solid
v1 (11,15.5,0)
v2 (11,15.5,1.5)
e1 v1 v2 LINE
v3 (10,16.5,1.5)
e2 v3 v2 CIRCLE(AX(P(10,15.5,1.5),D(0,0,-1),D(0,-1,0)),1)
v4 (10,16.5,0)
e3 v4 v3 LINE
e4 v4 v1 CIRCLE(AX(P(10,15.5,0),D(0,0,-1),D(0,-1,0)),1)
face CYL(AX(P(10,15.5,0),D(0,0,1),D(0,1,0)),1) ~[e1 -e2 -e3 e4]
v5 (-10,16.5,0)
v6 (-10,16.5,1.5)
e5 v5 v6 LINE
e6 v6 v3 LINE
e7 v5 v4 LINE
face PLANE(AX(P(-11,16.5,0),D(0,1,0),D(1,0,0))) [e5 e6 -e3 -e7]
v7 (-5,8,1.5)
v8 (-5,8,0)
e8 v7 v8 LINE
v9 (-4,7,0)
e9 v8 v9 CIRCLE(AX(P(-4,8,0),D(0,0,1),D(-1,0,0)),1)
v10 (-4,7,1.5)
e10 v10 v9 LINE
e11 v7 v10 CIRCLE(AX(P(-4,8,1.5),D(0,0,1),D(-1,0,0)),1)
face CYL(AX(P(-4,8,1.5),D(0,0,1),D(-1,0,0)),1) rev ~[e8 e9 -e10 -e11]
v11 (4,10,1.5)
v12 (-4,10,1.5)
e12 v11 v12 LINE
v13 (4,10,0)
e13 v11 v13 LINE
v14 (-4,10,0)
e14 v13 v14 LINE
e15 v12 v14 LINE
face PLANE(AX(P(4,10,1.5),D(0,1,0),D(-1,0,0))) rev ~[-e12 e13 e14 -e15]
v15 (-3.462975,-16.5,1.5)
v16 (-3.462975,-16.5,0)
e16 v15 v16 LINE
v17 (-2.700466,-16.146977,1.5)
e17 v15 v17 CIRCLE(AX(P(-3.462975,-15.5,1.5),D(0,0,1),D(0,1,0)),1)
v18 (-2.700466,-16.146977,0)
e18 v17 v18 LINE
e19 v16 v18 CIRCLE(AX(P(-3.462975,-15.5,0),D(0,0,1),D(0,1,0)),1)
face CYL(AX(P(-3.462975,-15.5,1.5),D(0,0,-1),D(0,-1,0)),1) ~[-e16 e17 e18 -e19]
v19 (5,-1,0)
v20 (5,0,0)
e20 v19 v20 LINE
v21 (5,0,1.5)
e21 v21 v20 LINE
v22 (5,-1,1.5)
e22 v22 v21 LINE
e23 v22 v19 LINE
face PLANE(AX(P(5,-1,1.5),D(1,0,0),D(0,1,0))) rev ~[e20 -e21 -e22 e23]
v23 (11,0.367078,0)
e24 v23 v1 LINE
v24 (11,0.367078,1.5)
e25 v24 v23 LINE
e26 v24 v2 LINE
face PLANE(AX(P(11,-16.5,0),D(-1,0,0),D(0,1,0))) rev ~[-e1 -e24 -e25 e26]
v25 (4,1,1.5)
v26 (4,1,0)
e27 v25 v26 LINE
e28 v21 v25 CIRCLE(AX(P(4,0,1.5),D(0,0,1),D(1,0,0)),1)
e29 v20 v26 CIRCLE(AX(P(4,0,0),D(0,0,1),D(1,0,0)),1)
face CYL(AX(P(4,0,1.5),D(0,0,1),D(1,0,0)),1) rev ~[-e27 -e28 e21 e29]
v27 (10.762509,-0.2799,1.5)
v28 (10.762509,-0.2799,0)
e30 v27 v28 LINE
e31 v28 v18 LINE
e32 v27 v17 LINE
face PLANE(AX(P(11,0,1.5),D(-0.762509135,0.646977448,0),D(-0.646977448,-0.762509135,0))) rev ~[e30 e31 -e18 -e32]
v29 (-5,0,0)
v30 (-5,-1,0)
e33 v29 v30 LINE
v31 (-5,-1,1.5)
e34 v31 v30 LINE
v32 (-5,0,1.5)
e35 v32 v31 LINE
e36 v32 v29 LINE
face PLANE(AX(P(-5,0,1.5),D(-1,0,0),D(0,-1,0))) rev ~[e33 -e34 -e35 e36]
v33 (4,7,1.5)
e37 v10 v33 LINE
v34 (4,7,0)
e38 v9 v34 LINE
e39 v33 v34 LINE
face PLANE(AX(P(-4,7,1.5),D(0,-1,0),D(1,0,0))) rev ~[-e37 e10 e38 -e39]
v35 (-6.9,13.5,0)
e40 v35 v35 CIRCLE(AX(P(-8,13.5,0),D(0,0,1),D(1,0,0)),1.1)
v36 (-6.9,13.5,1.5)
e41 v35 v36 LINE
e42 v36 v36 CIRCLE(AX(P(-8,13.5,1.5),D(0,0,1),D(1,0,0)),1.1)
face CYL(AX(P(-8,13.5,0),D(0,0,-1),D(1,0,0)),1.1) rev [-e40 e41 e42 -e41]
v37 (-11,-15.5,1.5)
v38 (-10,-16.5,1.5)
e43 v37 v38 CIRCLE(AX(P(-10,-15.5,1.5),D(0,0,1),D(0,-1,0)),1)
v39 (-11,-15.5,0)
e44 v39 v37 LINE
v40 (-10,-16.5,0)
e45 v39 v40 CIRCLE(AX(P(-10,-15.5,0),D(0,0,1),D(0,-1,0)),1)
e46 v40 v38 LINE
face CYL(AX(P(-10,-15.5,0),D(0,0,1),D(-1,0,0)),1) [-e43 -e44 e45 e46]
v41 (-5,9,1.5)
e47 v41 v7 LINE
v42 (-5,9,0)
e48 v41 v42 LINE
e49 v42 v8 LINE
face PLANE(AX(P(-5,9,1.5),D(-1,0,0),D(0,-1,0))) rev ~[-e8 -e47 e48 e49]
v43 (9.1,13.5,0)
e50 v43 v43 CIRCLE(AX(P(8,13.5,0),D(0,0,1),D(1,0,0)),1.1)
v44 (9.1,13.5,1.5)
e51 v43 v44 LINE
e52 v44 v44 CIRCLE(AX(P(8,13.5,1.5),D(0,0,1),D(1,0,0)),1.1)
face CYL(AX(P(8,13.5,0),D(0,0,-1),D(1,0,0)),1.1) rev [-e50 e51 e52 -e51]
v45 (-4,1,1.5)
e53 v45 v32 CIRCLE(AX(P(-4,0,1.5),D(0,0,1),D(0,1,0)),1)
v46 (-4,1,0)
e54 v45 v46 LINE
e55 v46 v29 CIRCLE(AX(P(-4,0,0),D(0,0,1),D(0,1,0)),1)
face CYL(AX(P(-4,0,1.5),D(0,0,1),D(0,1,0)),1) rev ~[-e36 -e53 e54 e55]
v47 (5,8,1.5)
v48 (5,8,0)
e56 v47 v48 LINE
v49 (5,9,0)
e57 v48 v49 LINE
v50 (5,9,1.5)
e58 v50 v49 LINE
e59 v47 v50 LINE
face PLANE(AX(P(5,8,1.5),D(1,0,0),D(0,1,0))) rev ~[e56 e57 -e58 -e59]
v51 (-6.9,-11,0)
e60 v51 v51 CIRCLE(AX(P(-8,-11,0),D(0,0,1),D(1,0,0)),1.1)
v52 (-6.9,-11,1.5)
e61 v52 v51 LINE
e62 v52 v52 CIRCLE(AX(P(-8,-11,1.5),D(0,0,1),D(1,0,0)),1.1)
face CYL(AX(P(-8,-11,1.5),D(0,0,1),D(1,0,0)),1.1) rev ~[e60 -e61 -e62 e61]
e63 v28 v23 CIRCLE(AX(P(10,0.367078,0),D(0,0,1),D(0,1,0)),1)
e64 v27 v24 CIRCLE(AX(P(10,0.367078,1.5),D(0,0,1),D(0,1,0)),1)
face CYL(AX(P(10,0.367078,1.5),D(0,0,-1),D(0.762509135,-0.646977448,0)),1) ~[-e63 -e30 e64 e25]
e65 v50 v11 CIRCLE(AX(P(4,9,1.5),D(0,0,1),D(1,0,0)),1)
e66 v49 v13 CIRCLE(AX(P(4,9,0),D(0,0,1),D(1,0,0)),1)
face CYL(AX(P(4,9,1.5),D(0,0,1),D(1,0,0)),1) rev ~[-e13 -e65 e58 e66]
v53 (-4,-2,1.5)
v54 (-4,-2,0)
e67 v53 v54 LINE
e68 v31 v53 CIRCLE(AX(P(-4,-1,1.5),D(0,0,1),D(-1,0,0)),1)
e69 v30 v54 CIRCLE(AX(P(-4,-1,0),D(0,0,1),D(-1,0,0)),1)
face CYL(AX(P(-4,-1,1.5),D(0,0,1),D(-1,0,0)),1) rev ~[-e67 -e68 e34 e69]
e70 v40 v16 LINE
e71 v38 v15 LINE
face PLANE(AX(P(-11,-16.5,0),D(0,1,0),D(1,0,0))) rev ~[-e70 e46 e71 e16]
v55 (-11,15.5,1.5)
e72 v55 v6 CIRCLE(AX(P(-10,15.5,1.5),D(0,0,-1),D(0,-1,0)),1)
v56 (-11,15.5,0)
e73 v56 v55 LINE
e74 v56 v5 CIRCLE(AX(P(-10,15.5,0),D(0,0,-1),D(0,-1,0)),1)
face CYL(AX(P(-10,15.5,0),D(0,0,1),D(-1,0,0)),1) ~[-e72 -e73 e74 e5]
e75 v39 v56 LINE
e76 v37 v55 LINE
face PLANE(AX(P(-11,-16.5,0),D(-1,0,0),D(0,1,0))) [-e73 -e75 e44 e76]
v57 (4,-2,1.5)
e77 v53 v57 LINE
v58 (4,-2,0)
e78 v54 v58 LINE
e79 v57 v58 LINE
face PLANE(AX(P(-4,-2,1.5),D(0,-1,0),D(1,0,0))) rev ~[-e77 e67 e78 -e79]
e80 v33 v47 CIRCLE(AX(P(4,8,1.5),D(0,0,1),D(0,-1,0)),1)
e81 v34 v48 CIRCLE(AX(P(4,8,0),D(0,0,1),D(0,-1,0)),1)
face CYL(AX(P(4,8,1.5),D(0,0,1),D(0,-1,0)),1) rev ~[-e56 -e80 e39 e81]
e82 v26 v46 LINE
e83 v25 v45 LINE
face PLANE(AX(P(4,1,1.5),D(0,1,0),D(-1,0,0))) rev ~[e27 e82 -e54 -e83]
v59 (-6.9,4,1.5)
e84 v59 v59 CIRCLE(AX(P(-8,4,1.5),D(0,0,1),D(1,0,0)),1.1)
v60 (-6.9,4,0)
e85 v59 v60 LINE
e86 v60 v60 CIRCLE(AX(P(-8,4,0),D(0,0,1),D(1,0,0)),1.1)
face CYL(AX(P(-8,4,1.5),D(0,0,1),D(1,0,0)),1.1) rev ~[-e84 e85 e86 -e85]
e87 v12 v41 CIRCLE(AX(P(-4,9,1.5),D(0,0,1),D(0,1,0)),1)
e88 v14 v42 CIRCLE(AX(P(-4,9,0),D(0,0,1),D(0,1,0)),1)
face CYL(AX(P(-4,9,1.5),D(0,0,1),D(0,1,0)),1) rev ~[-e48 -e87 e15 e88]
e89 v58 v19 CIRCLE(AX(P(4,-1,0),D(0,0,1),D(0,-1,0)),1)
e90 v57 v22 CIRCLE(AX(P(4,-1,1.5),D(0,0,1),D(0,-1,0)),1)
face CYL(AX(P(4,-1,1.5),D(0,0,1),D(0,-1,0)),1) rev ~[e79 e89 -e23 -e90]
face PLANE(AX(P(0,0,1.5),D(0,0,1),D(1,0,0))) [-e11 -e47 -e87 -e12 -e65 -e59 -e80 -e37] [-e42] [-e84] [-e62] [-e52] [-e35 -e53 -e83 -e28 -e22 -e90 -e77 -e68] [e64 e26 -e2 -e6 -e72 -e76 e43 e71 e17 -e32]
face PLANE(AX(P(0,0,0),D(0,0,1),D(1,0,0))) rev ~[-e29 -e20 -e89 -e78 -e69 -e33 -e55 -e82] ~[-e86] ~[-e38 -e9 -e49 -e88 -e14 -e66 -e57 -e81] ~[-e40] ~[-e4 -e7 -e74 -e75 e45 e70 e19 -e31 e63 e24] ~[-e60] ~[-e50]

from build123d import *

# Parameters (mm, degrees)
F0_W     = 22
F0_H     = 33
F0_R     = 1.1
F1_DEPTH = 1.5
F2_R     = 1.1
F3_DEPTH = 1.5
F4_R     = 1


# Not quite as in the source:
# - a feature names something its author has since deleted; it is built from what else it names


with BuildPart() as f1:
    # F0 (on Top) → F1 (new body)
    with BuildSketch(Plane.XY):
        Rectangle(F0_W, F0_H)
        with Locations((-8, 13.5)):
            Circle(F0_R, mode=Mode.SUBTRACT)
        with Locations((8, 13.5)):
            Circle(F0_R, mode=Mode.SUBTRACT)
    extrude(amount=F1_DEPTH)

    # F2 (on face) → F3 (cut, through all)
    with BuildSketch(Plane.XY.offset(1.5)):
        with BuildLine():
            Line((4, 10), (-4, 10))
            ThreePointArc((-4, 10), (-4.7071067812, 9.7071067812), (-5, 9))
            Line((-5, 9), (-5, 8))
            ThreePointArc((-5, 8), (-4.7071067812, 7.2928932188), (-4, 7))
            Line((-4, 7), (4, 7))
            ThreePointArc((4, 7), (4.7071067812, 7.2928932188), (5, 8))
            Line((5, 8), (5, 9))
            ThreePointArc((5, 9), (4.7071067812, 9.7071067812), (4, 10))
        make_face()
        with BuildLine():
            Line((4, 1), (-4, 1))
            ThreePointArc((-4, 1), (-4.7071067812, 0.7071067812), (-5, 0))
            Line((-5, 0), (-5, -1))
            ThreePointArc((-5, -1), (-4.7071067812, -1.7071067812), (-4, -2))
            Line((-4, -2), (4, -2))
            ThreePointArc((4, -2), (4.7071067812, -1.7071067812), (5, -1))
            Line((5, -1), (5, 0))
            ThreePointArc((5, 0), (4.7071067812, 0.7071067812), (4, 1))
        make_face()
        Polygon((11, -16.5), (11, 0), (-3, -16.5), align=None)
        with Locations((-8, 4)):
            Circle(F2_R)
        with Locations((-8, -11)):
            Circle(F2_R)
    extrude(amount=-F3_DEPTH, mode=Mode.SUBTRACT)

    # F4
    f4_edges = [f1.edges().sort_by_distance(p)[0] for p in [
        (-11, 16.5, 0.75),
        (11, 16.5, 0.75),
        (-11, -16.5, 0.75),
        (11, 0, 0.75),
        (-3, -16.5, 0.75),
    ]]
    fillet(f4_edges, radius=F4_R)


solid = f1.part
